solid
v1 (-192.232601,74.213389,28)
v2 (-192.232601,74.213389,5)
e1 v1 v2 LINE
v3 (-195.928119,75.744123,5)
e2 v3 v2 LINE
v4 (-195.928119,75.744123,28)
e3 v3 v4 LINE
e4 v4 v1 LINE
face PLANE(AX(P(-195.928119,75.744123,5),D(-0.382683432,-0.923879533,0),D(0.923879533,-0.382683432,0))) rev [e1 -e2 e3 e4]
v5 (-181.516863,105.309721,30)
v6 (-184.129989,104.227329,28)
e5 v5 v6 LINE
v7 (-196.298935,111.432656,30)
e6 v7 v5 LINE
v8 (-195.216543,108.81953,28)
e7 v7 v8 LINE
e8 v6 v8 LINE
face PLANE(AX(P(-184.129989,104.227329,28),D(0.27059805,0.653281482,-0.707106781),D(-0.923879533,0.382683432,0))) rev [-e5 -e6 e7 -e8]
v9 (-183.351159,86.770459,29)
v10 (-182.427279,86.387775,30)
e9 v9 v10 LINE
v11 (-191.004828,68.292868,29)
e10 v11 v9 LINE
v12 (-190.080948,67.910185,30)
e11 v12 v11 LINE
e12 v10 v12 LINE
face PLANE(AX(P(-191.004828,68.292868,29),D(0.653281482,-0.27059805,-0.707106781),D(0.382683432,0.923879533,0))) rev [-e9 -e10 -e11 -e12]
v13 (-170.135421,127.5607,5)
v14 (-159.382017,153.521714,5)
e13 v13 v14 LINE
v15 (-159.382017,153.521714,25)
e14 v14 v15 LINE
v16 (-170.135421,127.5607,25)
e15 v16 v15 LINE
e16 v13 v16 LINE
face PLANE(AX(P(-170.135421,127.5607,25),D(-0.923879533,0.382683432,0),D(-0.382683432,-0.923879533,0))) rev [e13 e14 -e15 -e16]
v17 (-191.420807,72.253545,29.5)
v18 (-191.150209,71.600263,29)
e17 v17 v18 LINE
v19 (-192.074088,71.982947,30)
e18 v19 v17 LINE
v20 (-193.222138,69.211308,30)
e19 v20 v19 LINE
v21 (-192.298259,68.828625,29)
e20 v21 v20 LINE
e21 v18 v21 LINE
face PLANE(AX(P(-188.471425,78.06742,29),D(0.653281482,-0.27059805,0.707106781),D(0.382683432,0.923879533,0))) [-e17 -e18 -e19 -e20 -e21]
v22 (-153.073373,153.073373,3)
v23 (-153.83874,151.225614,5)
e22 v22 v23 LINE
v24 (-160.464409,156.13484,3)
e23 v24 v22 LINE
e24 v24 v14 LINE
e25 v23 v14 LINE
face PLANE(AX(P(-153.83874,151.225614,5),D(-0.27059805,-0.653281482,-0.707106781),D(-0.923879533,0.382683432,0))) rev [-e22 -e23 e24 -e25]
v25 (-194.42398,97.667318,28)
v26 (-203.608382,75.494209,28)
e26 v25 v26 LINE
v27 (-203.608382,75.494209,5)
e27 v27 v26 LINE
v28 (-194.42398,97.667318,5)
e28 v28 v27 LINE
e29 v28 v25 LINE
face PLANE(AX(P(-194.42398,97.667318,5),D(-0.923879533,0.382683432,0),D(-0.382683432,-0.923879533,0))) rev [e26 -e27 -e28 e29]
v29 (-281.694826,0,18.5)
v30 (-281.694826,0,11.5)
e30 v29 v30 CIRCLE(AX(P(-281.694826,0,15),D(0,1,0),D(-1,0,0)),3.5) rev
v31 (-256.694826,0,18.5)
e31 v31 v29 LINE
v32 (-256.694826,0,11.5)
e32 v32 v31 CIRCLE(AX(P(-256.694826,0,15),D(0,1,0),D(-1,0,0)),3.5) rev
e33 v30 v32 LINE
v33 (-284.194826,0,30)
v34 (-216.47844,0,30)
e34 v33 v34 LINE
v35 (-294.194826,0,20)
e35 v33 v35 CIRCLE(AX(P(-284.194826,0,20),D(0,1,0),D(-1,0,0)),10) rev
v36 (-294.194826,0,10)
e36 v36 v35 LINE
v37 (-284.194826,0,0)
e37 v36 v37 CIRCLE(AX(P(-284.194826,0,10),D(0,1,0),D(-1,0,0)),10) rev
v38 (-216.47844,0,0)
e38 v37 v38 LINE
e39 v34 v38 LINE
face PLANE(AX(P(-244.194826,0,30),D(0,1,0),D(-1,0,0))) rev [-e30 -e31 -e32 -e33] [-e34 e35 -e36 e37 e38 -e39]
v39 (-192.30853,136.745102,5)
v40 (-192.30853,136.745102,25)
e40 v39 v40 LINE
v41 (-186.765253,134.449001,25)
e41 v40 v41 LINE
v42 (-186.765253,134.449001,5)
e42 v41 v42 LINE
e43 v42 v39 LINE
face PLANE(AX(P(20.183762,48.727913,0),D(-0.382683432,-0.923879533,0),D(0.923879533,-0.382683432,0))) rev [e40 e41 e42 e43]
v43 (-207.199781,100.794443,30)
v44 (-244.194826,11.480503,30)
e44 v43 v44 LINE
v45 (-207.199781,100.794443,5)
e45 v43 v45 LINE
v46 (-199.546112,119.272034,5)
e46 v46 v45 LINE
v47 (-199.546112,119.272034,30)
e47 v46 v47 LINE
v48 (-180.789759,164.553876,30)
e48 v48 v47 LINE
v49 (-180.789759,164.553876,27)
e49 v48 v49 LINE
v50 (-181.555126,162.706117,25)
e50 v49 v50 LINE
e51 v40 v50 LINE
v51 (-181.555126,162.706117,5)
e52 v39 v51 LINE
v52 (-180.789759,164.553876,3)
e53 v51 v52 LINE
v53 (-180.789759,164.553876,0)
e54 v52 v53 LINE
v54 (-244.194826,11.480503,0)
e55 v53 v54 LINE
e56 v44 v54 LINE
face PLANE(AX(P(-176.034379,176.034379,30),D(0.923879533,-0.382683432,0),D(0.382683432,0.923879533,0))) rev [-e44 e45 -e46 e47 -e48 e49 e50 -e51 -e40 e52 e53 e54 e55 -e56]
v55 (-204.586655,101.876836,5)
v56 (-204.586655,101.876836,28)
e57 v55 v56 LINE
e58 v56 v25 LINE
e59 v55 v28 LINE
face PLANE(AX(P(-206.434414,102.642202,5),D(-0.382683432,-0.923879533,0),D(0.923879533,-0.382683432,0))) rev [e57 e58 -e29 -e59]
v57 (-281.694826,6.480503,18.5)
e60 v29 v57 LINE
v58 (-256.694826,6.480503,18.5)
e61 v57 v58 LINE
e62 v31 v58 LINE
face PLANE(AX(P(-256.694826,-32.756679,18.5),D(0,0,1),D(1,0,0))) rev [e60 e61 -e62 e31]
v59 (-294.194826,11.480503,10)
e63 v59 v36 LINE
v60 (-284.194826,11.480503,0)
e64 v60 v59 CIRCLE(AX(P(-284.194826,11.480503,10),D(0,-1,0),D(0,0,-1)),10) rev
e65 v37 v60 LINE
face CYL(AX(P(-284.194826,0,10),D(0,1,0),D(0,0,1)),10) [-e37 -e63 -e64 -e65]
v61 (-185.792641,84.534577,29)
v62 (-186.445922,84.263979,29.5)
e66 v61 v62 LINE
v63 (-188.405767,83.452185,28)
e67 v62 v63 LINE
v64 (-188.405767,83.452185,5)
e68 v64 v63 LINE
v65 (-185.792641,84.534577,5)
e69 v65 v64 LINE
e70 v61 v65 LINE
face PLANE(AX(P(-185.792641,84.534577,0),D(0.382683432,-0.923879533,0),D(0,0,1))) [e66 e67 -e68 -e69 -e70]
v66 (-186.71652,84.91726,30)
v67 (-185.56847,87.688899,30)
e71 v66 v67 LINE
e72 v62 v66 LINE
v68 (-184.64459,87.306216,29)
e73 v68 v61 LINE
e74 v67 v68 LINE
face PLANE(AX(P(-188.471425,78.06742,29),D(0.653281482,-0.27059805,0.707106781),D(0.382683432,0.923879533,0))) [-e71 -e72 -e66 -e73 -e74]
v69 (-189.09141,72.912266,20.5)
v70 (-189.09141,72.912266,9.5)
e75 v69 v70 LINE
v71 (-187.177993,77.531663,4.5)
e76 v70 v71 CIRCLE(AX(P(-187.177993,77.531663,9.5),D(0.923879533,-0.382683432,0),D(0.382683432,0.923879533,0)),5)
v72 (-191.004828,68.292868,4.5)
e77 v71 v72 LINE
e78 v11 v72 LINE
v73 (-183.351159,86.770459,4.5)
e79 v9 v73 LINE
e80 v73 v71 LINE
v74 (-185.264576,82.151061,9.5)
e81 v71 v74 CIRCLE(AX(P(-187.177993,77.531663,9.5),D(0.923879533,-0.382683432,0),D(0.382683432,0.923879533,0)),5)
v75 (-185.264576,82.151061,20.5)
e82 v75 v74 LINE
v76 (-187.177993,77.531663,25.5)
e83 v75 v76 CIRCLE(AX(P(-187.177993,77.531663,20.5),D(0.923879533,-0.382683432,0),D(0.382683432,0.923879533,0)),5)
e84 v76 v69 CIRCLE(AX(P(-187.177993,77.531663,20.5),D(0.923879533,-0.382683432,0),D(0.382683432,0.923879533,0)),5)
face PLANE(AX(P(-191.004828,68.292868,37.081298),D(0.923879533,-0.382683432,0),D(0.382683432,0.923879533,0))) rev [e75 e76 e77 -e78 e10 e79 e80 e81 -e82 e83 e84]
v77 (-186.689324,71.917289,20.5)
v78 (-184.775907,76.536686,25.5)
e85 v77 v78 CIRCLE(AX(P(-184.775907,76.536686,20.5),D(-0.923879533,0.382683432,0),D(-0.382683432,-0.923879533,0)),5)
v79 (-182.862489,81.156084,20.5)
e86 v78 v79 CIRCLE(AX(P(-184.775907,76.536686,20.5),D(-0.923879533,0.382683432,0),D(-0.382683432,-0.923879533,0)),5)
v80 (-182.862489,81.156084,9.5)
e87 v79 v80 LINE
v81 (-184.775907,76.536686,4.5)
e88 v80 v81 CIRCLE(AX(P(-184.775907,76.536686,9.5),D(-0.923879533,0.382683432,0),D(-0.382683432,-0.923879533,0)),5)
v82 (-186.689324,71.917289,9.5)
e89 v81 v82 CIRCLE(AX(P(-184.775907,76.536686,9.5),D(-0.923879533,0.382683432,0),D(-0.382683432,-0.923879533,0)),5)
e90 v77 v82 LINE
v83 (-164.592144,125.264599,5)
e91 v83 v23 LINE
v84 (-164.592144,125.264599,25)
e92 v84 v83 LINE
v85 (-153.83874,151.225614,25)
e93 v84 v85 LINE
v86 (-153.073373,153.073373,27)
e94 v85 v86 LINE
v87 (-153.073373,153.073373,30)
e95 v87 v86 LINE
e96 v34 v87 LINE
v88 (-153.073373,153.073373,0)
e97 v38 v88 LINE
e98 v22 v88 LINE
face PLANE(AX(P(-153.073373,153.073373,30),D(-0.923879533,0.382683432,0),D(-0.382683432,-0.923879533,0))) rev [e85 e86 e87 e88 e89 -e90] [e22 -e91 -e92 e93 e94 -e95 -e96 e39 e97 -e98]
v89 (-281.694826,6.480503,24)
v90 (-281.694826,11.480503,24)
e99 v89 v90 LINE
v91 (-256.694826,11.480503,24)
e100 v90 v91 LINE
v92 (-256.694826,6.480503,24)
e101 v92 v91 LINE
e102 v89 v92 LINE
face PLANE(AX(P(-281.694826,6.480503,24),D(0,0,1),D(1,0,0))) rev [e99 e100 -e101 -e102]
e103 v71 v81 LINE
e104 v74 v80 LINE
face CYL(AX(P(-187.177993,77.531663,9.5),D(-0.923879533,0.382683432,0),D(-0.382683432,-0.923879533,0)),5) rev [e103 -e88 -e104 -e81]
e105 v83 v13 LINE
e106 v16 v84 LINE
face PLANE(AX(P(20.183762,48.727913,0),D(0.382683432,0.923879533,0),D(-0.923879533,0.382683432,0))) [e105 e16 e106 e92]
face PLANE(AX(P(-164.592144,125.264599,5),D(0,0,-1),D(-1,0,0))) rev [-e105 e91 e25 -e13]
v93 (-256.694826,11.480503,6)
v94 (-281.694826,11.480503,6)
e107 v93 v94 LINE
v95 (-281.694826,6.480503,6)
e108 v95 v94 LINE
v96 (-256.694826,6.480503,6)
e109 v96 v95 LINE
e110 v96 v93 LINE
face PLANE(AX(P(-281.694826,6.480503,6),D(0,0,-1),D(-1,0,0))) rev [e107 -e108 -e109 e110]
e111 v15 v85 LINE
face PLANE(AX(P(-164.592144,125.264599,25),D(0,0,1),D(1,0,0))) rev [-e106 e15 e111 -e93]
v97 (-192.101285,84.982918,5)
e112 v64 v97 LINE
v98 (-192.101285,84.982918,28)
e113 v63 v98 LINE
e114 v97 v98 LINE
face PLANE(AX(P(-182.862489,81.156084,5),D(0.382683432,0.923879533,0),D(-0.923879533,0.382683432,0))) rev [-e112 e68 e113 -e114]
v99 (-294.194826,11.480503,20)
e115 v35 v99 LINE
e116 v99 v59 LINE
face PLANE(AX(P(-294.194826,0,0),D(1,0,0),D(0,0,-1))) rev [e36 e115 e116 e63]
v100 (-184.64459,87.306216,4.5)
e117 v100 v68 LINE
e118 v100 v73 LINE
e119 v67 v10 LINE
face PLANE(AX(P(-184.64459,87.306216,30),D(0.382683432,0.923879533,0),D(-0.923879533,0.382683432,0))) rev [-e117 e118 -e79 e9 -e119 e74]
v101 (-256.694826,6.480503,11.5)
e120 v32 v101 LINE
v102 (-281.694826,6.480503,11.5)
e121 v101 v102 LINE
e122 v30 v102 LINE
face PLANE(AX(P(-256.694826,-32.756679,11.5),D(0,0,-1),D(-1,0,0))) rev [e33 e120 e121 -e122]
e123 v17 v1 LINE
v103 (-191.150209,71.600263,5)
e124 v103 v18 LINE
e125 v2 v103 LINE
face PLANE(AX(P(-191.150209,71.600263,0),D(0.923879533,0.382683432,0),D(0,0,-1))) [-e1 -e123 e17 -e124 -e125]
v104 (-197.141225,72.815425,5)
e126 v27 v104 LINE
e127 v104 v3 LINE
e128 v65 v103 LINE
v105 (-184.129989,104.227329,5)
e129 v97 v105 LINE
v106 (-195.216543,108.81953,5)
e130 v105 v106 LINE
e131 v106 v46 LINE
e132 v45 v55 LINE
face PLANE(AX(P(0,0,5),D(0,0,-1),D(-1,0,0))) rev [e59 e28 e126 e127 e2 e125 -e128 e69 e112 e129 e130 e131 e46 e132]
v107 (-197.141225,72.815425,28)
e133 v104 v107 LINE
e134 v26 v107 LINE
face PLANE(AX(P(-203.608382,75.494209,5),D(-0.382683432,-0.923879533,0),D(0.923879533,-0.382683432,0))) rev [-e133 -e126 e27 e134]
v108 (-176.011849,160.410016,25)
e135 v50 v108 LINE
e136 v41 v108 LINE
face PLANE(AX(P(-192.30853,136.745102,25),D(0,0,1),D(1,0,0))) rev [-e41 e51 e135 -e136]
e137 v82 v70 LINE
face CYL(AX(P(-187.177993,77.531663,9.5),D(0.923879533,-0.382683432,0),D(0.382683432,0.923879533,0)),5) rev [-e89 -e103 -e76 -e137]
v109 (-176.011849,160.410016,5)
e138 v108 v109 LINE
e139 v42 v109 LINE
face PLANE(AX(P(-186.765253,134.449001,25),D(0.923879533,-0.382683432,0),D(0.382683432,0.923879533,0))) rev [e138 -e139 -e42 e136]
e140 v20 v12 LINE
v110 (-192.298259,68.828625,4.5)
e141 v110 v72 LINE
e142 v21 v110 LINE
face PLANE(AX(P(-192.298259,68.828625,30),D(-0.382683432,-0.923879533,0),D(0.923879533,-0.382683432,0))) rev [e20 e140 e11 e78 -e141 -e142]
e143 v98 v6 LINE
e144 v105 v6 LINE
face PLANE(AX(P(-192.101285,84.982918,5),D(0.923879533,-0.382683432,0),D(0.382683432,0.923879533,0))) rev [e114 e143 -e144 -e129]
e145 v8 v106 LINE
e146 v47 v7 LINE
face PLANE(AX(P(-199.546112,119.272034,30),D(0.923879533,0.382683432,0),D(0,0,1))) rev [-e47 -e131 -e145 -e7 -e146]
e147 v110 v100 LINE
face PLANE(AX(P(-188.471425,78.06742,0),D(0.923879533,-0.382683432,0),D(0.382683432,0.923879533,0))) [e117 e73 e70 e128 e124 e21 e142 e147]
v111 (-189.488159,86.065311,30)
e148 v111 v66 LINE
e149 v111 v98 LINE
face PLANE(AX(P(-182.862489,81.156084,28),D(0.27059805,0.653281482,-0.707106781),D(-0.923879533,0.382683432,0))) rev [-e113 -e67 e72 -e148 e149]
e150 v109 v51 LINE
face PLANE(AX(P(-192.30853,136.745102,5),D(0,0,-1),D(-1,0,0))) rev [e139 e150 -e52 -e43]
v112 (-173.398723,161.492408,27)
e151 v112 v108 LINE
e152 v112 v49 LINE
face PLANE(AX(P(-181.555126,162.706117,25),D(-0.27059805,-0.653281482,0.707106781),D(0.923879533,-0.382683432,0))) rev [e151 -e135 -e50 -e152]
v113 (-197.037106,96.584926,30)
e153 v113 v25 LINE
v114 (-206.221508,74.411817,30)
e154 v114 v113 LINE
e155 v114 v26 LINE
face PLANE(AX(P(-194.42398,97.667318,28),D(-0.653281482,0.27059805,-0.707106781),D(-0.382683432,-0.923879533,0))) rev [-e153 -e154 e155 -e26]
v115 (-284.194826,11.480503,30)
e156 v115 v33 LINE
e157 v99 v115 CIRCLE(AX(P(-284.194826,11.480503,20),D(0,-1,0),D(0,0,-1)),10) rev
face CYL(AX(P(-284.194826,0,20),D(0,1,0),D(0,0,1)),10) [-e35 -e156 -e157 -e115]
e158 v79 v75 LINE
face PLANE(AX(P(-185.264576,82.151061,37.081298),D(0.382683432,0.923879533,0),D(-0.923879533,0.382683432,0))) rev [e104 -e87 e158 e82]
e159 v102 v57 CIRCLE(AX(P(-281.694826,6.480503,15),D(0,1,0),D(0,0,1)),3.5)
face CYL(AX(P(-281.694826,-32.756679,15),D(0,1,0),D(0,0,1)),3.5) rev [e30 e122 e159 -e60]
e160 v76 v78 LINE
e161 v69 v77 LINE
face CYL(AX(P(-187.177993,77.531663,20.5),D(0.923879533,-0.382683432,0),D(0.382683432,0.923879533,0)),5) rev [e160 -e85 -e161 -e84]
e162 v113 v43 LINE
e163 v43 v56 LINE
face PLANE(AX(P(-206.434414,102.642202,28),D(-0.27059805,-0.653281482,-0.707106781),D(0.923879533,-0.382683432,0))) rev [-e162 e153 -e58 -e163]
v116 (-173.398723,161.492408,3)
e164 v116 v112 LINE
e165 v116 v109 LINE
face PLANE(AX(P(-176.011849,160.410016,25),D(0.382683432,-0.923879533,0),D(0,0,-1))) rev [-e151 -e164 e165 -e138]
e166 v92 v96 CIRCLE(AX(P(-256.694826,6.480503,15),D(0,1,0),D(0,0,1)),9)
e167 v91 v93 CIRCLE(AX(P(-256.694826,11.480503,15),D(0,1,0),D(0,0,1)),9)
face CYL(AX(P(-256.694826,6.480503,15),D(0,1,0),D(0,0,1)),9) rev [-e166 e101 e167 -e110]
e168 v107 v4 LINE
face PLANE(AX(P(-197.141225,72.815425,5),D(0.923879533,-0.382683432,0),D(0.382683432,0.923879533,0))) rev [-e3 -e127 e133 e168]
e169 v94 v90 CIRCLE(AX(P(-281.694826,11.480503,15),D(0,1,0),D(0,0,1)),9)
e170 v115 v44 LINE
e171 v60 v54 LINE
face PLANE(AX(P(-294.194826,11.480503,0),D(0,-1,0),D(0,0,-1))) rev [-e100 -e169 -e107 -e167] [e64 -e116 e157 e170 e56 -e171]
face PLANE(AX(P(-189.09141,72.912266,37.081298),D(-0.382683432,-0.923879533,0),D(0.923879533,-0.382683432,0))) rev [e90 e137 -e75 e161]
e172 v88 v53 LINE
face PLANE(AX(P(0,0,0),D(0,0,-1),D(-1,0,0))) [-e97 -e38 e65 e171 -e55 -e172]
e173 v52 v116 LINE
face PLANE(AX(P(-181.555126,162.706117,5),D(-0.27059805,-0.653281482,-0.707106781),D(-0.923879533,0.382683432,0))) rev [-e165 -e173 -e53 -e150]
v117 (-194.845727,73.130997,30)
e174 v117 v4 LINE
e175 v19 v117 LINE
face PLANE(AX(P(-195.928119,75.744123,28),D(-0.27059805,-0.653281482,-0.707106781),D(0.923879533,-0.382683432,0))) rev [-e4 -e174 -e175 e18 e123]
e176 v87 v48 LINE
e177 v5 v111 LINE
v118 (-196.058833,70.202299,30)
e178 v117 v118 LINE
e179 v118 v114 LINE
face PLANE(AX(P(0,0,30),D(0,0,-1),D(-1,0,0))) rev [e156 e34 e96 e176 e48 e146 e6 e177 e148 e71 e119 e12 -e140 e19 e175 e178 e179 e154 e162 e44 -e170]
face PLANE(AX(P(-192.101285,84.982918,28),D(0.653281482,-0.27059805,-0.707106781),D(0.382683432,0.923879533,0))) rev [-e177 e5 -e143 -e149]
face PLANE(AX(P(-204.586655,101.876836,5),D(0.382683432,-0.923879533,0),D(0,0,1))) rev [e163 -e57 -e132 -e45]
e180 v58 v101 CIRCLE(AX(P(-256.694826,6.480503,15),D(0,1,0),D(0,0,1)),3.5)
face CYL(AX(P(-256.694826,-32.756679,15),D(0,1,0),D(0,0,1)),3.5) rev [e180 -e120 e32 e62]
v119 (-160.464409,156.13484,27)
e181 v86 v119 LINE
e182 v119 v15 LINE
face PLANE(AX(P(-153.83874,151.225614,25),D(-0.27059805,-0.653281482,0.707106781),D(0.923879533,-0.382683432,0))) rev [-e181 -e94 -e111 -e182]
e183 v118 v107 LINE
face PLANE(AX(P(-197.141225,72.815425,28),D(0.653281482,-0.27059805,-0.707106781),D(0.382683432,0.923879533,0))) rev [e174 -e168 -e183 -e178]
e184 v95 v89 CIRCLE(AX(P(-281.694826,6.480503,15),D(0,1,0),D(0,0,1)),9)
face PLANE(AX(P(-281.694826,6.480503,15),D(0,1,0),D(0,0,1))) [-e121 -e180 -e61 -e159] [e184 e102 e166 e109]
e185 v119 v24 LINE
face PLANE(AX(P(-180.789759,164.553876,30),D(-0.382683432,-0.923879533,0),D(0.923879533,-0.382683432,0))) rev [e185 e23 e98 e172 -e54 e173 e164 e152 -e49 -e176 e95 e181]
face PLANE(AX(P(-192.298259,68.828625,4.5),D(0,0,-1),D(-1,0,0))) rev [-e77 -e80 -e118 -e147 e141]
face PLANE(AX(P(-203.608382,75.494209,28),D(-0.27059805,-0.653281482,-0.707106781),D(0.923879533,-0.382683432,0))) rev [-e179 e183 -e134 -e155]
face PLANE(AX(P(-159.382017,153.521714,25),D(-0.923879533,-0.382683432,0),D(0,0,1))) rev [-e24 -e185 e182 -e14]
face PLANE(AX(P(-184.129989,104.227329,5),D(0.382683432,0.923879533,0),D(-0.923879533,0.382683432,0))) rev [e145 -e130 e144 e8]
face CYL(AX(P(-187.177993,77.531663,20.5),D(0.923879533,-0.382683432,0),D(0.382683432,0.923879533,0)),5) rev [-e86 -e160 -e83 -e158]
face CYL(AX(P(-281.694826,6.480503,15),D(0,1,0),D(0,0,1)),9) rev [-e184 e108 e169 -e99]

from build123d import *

# Parameters (mm, degrees)
BOSS_EXTRUDE1_DEPTH = 30
SKETCH4_W           = 30
SKETCH4_H           = 11.480502971
BOSS_EXTRUDE2_DEPTH = 50
CUT_EXTRUDE1_DEPTH  = 5
CUT_EXTRUDE3_DEPTH  = 6.480502971
FILLET1_R           = 10
CHAMFER3_SIZE       = 22.5
CHAMFER3_SIZE2      = 8.610377228
CHAMFER1_SIZE       = 15
CHAMFER1_SIZE2      = 20.645728807
CHAMFER2_SIZE2      = 20.645728807
CHAMFER2_SIZE       = 15
CUT_EXTRUDE4_DEPTH  = 25
CUT_EXTRUDE5_DEPTH  = 25
SKETCH9_W           = 20.645728807
SKETCH9_H           = 30
CUT_EXTRUDE6_DEPTH  = 40
SKETCH10_W          = 10
SKETCH10_H          = 12.413129657
BOSS_EXTRUDE3_DEPTH = 12
SKETCH11_W          = 31
SKETCH11_H          = 30
CUT_EXTRUDE7_DEPTH  = 2
SKETCH12_W          = 25.5
SKETCH12_H          = 20
CUT_EXTRUDE8_DEPTH  = 4
CHAMFER4_SIZE       = 2
CUT_EXTRUDE9_DEPTH  = 30
SKETCH16_W          = 6
SKETCH16_H          = 20
CUT_EXTRUDE10_DEPTH = 30.1
CHAMFER6_SIZE       = 2
BOSS_EXTRUDE4_DEPTH = 25.5
SKETCH18_W          = 2.6
SKETCH18_H          = 4.5
BOSS_EXTRUDE5_DEPTH = 10
CHAMFER7_SIZE       = 1
FILLET2_R           = 5
CHAMFER8_SIZE       = 8


with BuildPart() as part:
    # Sketch1 → Boss-Extrude1 (new body)
    with BuildSketch(Plane.XY):
        Polygon((0, 216.478440058), (-153.073372946, 153.073372946), (-216.478440058, 0), (-244.194826034, 0), (-244.194826034, 11.480502971), (-176.034378888, 176.034378888), (0, 248.950206067), align=None)
    extrude(amount=BOSS_EXTRUDE1_DEPTH)

    # Sketch4 → Boss-Extrude2 (add)
    with BuildSketch(Plane.ZY.offset(244.194826034)):
        with Locations((15, 5.740251485)):
            Rectangle(SKETCH4_W, SKETCH4_H)
    extrude(amount=BOSS_EXTRUDE2_DEPTH)

    # Sketch5 → Cut-Extrude1 (cut)
    with BuildSketch(Plane(origin=(0, 11.480502971, 0), x_dir=(1, 0, 0), z_dir=(0, 1, 0))):
        with BuildLine():
            Line((-281.694826034, -6), (-256.694826034, -6))
            ThreePointArc((-256.694826034, -6), (-247.694826034, -15), (-256.694826034, -24))
            Line((-256.694826034, -24), (-281.694826034, -24))
            ThreePointArc((-281.694826034, -24), (-290.694826034, -15), (-281.694826034, -6))
        make_face()
    extrude(amount=-CUT_EXTRUDE1_DEPTH, mode=Mode.SUBTRACT)

    # Sketch7 → Cut-Extrude3 (cut)
    with BuildSketch(Plane(origin=(0, 6.480502971, 0), x_dir=(1, 0, 0), z_dir=(0, 1, 0))):
        with BuildLine():
            Line((-256.694826034, -11.5), (-281.694826034, -11.5))
            ThreePointArc((-281.694826034, -11.5), (-285.194826034, -15), (-281.694826034, -18.5))
            Line((-281.694826034, -18.5), (-256.694826034, -18.5))
            ThreePointArc((-256.694826034, -18.5), (-253.194826034, -15), (-256.694826034, -11.5))
        make_face()
    extrude(amount=-CUT_EXTRUDE3_DEPTH, mode=Mode.SUBTRACT)

    # Fillet1
    fillet1_edges = [part.edges().sort_by_distance(p)[0] for p in [
        (-294.194826034, 5.740251485, 0),
        (-294.194826034, 5.740251485, 30),
    ]]
    fillet(fillet1_edges, radius=FILLET1_R)

    # Chamfer3
    chamfer3_edges = [part.edges().sort_by_distance(p)[0] for p in [
        (0, 248.950206067, 15),
    ]]
    chamfer3_side = [part.faces().sort_by_distance(p)[0] for p in [
        (-88.017189444, 212.492292478, 15),
    ]]
    chamfer(chamfer3_edges, length=CHAMFER3_SIZE, length2=CHAMFER3_SIZE2, reference=chamfer3_side[0])

    # Chamfer1
    chamfer1_edges = [part.edges().sort_by_distance(p)[0] for p in [
        (0, 228.409134449, 0),
    ]]
    chamfer1_side = [part.faces().sort_by_distance(p)[0] for p in [
        (0, 228.409134449, 15),
    ]]
    chamfer(chamfer1_edges, length=CHAMFER1_SIZE, length2=CHAMFER1_SIZE2, reference=chamfer1_side[0])

    # Chamfer2
    chamfer2_edges = [part.edges().sort_by_distance(p)[0] for p in [
        (0, 228.409134449, 30),
    ]]
    chamfer2_side = [part.faces().sort_by_distance(p)[0] for p in [
        (0, 228.409134449, 29.7),
    ]]
    chamfer(chamfer2_edges, length=CHAMFER2_SIZE - 0.0001, length2=CHAMFER2_SIZE2 - 0.0001, reference=chamfer2_side[0])  # a hair under: the kernel refuses the full size

    # Sketch3 → Cut-Extrude4 (cut)
    with BuildSketch(Plane.XY.offset(30)):
        Polygon((-186.689323664, 71.91728881), (-182.86248934, 81.156084136), (-192.101284666, 84.982918459), (-184.129988769, 104.227329121), (-202.60757942, 111.880997769), (-206.434413743, 102.642202444), (-194.423979821, 97.667317823), (-203.608382197, 75.494209043), (-197.14122547, 72.815425016), (-195.928118989, 75.744123134), align=None)
        Polygon((-81.156084136, 182.86248934), (-71.91728881, 186.689323664), (-75.744123134, 195.928118989), (-72.815425016, 197.14122547), (-75.494209043, 203.608382197), (-97.667317823, 194.423979821), (-102.642202444, 206.434413743), (-111.880997769, 202.60757942), (-106.906113148, 190.597145497), (-104.227329121, 184.129988769), (-84.982918459, 192.101284666), align=None)
    extrude(amount=-CUT_EXTRUDE4_DEPTH, mode=Mode.SUBTRACT)

    # Sketch8 → Cut-Extrude5 (cut)
    with BuildSketch(Plane.XY.offset(30)):
        Polygon((-66.282610192, 194.435244969), (-67.813343921, 198.130763099), (-66.889464389, 198.513446531), (-70.716298712, 207.752241857), (-71.640178245, 207.369558424), (-73.170911974, 211.065076554), (-72.247032442, 211.447759987), (-74.925816468, 217.914916714), (-46.28555096, 229.778103118), (-43.606766934, 223.31094639), (-38.987369271, 225.224363552), (-37.456635542, 221.528845422), (-42.076033204, 219.61542826), (-38.249198881, 210.376632935), (-33.629801218, 212.290050097), (-32.099067489, 208.594531967), align=None)
    extrude(amount=-CUT_EXTRUDE5_DEPTH, mode=Mode.SUBTRACT)

    # Sketch9 → Cut-Extrude6 (cut)
    with BuildSketch(Plane(origin=(0, 240.339828839, 0), x_dir=(1, 0, 0), z_dir=(0, 1, 0))):
        with Locations((-10.322864404, -15)):
            Rectangle(SKETCH9_W, SKETCH9_H)
    extrude(amount=-CUT_EXTRUDE6_DEPTH, mode=Mode.SUBTRACT)


with BuildPart() as cut_extrude6_kept_piece:
    # of the separate pieces the step leaves, the one the design keeps (cut_extrude6_pieces_kept)
    add(part.part.solids().sort_by_distance((-20.787289482, 240.339828839, 30))[0])

    # Sketch10 → Boss-Extrude3 (add)
    with BuildSketch(Plane(origin=(-20.645728807, 0, 0), x_dir=(0, 0, -1), z_dir=(1, 0, 0))):
        with Locations((-15, 224.13326401)):
            Rectangle(SKETCH10_W, SKETCH10_H)
    extrude(amount=BOSS_EXTRUDE3_DEPTH)

    # Sketch11 → Cut-Extrude7 (cut)
    with BuildSketch(Plane(origin=(-76.536686473, 184.775906502, 0), x_dir=(0.9238795325112865, 0.38268343236509045, 0), z_dir=(0.38268343236509045, -0.9238795325112865, 0))):
        with Locations((0.5, 15)):
            Rectangle(SKETCH11_W, SKETCH11_H)
    extrude(amount=-CUT_EXTRUDE7_DEPTH, mode=Mode.SUBTRACT)

    # Sketch12 → Cut-Extrude8 (cut)
    with BuildSketch(Plane(origin=(-184.775906502, 76.536686473, 0), x_dir=(0, 0, -1), z_dir=(0.9238795325112872, -0.38268343236508917, 0))):
        with Locations((-17.25, 0)):
            Rectangle(SKETCH12_W, SKETCH12_H)
    extrude(amount=-CUT_EXTRUDE8_DEPTH, mode=Mode.SUBTRACT)

    # Chamfer4
    chamfer4_edges = [cut_extrude6_kept_piece.edges().sort_by_distance(p)[0] for p in [
        (-111.880997769, 202.60757942, 17.5),
        (-102.642202444, 206.434413743, 17.5),
        (-83.45218473, 188.405766535, 30),
        (-74.279774075, 196.534672229, 30),
        (-74.154817029, 200.374803834, 30),
        (-86.580763433, 199.016181009, 30),
        (-100.154760133, 200.429196782, 30),
        (-108.054163445, 193.368784094, 30),
        (-94.60512379, 188.115636717, 30),
        (-206.434413743, 102.642202444, 17.5),
        (-188.115636717, 94.60512379, 30),
        (-193.368784094, 108.054163445, 30),
        (-200.429196782, 100.154760133, 30),
        (-199.016181009, 86.580763433, 30),
        (-200.374803834, 74.154817029, 30),
        (-196.534672229, 74.279774075, 30),
        (-193.156480392, 74.596072837, 30),
        (-49.19083884, 201.514888468, 30),
        (-32.864434353, 210.442291032, 30),
        (-40.162616043, 214.996030597, 30),
        (-38.222002407, 223.376604487, 30),
        (-72.40554511, 209.217317489, 30),
        (-67.047977056, 196.283004034, 30),
        (-74.213389405, 192.232600859, 30),
        (-81.921451, 184.710248405, 17.5),
        (-72.682655675, 188.537082729, 17.5),
        (-189.329646068, 83.834868162, 30),
        (-186.55800747, 82.686817865, 17.5),
        (-190.384841794, 73.44802254, 17.5),
    ]]
    chamfer(chamfer4_edges, length=CHAMFER4_SIZE)

    # Sketch13 → Cut-Extrude9 (cut)
    with BuildSketch(Plane(origin=(0, 0, 0), x_dir=(-1, 0, 0), z_dir=(0, 0, -1))):
        Polygon((180.789758921, 164.553875917), (153.073372946, 153.073372946), (-25.433862624, 226.424491684), (-10.416597064, 262.970499532), (187.527299345, 181.632585119), align=None)
    extrude(amount=-CUT_EXTRUDE9_DEPTH, mode=Mode.SUBTRACT)

    # Sketch16 → Cut-Extrude10 (cut)
    with BuildSketch(Plane(origin=(31.702533556, 76.536686473, 0), x_dir=(0.9238795325112868, -0.38268343236508956, 0), z_dir=(0.38268343236508956, 0.9238795325112868, 0))):
        with Locations((-227, -15)):
            Rectangle(SKETCH16_W, SKETCH16_H)
        with Locations((-203, -15)):
            Rectangle(SKETCH16_W, SKETCH16_H)
    extrude(amount=-CUT_EXTRUDE10_DEPTH, mode=Mode.SUBTRACT)

    # Chamfer6
    chamfer6_edges = [cut_extrude6_kept_piece.edges().sort_by_distance(p)[0] for p in [
        (-178.018120324, 163.40582562, 25),
        (-175.246481726, 162.257775323, 15),
        (-178.018120324, 163.40582562, 5),
        (-155.845011544, 154.221423243, 5),
        (-158.616650141, 155.36947354, 15),
        (-155.845011544, 154.221423243, 25),
    ]]
    chamfer(chamfer6_edges, length=CHAMFER6_SIZE)

    # Sketch17 → Boss-Extrude4 (add)
    with BuildSketch(Plane.XY.offset(4.5)):
        Polygon((-188.602740826, 67.297891148), (-191.00482761, 68.292868072), (-189.091410449, 72.912265735), (-186.689323664, 71.91728881), align=None)
        Polygon((-183.351158963, 86.770458722), (-180.949072179, 85.775481798), (-182.86248934, 81.156084136), (-185.264576125, 82.15106106), align=None)
    extrude(amount=BOSS_EXTRUDE4_DEPTH)

    # Sketch18 → Boss-Extrude5 (add)
    with BuildSketch(Plane(origin=(-1.913417162, -4.619397663, 0), x_dir=(0.9238795325112867, -0.38268343236508984, 0), z_dir=(0.38268343236508984, 0.9238795325112867, 0))):
        with Locations((-201.3, -27.75)):
            Rectangle(SKETCH18_W, SKETCH18_H)
    extrude(amount=BOSS_EXTRUDE5_DEPTH)

    # Chamfer7
    chamfer7_edges = [cut_extrude6_kept_piece.edges().sort_by_distance(p)[0] for p in [
        (-185.218615457, 85.920396229, 30),
        (-191.724233807, 70.214444176, 30),
        (-187.177993287, 77.531663397, 30),
    ]]
    chamfer(chamfer7_edges, length=CHAMFER7_SIZE)

    # Fillet2
    fillet2_edges = [cut_extrude6_kept_piece.edges().sort_by_distance(p)[0] for p in [
        (-187.890367056, 72.414777273, 25.5),
        (-184.063532733, 81.653572598, 25.5),
        (-184.063532733, 81.653572598, 4.5),
        (-187.890367056, 72.414777273, 4.5),
    ]]
    fillet(fillet2_edges, radius=FILLET2_R - 0.0001)  # a hair under: the kernel refuses the full size

    # Chamfer8
    chamfer8_edges = [cut_extrude6_kept_piece.edges().sort_by_distance(p)[0] for p in [
        (-202.60757942, 111.880997769, 16.5),
    ]]
    chamfer(chamfer8_edges, length=CHAMFER8_SIZE)


solid = cut_extrude6_kept_piece.part
